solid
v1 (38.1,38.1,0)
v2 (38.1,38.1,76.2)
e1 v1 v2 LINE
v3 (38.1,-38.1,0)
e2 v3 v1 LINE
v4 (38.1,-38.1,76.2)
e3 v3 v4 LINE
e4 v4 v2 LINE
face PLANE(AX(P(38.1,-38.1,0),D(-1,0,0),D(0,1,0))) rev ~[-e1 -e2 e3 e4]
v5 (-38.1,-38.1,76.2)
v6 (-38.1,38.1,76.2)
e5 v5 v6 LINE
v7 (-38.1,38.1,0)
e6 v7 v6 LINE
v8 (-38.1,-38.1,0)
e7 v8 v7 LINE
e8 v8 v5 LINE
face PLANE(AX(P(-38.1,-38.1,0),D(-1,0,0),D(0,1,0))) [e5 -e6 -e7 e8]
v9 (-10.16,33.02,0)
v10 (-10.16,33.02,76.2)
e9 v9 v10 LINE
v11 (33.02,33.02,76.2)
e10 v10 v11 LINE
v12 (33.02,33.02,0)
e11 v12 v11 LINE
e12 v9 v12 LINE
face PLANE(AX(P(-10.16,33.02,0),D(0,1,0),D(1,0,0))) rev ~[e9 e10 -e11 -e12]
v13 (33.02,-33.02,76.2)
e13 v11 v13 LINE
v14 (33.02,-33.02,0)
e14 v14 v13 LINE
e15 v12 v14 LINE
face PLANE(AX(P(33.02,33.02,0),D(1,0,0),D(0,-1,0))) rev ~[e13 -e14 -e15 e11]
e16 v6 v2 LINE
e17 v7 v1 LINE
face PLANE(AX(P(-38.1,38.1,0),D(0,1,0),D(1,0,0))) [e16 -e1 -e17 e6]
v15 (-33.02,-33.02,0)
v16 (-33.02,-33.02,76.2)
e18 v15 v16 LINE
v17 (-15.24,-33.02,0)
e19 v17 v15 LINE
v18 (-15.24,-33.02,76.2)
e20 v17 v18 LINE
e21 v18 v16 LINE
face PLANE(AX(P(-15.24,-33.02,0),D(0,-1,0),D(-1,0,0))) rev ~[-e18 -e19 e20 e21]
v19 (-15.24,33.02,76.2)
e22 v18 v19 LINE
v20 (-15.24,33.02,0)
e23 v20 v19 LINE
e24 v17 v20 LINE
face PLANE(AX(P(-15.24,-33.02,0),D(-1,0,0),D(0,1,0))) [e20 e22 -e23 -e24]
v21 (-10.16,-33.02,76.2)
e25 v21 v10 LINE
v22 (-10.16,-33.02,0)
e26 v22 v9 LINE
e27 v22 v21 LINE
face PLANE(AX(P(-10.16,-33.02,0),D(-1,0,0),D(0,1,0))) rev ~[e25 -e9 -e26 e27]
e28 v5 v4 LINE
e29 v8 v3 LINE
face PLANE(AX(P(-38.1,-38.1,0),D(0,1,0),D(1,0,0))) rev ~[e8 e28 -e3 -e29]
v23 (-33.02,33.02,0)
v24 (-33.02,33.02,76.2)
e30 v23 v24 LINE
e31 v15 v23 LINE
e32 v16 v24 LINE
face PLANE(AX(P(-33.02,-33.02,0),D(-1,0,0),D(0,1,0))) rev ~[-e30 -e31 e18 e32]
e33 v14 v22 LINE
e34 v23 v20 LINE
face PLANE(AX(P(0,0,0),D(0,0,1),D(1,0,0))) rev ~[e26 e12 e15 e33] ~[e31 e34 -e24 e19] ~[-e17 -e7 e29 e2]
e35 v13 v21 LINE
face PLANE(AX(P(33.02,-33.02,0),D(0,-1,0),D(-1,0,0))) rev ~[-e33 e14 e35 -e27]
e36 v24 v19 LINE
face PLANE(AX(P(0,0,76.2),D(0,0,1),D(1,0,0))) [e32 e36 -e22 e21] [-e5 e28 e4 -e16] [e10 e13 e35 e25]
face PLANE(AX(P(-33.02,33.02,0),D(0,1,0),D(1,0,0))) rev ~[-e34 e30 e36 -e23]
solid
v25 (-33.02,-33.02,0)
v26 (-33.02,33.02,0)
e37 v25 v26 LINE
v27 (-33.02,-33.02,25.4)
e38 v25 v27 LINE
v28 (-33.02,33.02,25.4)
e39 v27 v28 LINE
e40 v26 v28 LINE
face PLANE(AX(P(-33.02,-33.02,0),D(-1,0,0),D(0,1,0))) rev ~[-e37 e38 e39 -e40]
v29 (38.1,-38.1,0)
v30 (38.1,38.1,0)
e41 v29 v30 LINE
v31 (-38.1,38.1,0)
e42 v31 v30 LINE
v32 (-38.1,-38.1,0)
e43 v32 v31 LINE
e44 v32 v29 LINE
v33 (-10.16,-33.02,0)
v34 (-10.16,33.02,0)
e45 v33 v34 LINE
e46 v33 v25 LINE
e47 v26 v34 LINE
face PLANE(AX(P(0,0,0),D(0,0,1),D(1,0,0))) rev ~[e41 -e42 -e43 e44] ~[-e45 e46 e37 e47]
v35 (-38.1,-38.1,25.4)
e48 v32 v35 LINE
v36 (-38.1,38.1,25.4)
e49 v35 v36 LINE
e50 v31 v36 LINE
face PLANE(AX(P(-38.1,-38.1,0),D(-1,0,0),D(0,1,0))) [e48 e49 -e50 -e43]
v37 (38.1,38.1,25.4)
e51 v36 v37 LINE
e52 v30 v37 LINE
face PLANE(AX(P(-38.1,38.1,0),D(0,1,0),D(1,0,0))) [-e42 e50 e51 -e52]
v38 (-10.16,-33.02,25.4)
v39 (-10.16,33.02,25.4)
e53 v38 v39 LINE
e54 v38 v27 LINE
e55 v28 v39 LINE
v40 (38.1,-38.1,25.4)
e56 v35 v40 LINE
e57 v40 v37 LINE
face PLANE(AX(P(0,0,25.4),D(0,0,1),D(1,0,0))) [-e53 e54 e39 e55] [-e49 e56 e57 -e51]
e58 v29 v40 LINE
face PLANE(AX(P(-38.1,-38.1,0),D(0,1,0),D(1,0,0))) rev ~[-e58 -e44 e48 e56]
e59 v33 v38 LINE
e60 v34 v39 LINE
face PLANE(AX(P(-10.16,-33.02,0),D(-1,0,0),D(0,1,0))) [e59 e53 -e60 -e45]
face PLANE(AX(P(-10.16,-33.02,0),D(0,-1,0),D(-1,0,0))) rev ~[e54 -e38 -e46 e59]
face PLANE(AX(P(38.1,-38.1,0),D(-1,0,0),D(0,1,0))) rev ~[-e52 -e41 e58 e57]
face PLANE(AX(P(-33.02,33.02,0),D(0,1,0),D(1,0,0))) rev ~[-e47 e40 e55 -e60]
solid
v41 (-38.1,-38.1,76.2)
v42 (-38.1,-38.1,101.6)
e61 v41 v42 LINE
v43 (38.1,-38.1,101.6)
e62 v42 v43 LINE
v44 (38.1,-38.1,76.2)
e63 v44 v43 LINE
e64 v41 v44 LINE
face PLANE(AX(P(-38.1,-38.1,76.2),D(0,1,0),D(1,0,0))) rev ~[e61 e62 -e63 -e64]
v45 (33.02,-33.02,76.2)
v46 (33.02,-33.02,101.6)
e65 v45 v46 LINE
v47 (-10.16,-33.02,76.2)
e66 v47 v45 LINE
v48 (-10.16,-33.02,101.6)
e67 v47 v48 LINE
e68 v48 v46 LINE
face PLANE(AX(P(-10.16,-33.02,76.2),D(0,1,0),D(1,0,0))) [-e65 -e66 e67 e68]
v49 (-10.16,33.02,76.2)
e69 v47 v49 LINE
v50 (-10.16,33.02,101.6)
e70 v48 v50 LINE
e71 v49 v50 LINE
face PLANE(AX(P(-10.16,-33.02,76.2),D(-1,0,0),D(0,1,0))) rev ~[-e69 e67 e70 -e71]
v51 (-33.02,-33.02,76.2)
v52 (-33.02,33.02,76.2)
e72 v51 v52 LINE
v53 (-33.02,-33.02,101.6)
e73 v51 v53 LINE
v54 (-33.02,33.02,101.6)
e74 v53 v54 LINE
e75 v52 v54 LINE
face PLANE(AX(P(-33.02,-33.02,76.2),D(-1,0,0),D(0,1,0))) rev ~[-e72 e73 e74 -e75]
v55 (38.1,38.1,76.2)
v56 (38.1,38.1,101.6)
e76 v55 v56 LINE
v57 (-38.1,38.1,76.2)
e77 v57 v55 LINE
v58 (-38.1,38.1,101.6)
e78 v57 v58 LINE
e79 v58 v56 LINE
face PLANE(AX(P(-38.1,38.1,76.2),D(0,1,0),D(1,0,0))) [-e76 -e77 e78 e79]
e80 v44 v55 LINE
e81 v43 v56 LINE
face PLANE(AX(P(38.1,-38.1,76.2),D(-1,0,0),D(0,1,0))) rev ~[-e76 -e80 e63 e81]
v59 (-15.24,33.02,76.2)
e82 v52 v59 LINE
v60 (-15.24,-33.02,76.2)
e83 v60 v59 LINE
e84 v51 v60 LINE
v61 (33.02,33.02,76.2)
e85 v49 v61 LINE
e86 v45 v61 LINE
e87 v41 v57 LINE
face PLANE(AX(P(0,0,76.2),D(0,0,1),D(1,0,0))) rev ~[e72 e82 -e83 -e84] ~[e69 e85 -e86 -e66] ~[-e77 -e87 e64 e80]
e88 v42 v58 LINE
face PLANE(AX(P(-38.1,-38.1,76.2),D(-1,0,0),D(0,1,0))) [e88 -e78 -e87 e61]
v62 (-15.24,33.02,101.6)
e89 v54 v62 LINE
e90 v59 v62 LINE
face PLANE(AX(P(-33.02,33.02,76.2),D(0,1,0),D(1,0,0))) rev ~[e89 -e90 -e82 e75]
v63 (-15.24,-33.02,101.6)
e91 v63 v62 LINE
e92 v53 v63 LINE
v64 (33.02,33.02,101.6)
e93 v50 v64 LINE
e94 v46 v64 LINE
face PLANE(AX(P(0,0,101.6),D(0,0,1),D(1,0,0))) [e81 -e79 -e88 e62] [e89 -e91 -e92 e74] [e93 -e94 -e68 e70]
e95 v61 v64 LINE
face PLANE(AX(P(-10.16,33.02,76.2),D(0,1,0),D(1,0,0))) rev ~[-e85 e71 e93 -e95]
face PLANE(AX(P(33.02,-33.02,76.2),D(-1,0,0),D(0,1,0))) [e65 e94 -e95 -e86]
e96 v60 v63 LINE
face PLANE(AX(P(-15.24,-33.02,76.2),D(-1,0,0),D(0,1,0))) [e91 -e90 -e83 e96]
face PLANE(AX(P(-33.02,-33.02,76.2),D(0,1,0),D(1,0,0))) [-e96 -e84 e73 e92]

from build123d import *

# Parameters (mm, degrees)
F0_W        = 76.2
F0_H        = 76.2
F0_W_2      = 5.08
F0_H_2      = 66.04
F1_DEPTH    = 76.2
F0_W_3      = 43.18
F1_FACE_W   = 76.2
F1_FACE_H   = 76.2
F1_FACE_W_2 = 43.18
F1_FACE_H_2 = 66.04
F1_FACE_W_3 = 17.78
F2_DEPTH    = 25.4


# Not quite as in the source:
# - a feature names something its author has since deleted; it is built from what else it names


with BuildPart() as f1:
    # F0 (on Top) → F1 (new body)
    with BuildSketch(Plane.XY):
        Rectangle(F0_W, F0_H)
        Polygon((-10.16, 33.02), (33.02, 33.02), (33.02, -33.02), (-10.16, -33.02), (-15.24, -33.02), (-33.02, -33.02), (-33.02, 33.02), (-15.24, 33.02), align=None, mode=Mode.SUBTRACT)
        with Locations((-12.7, 0)):
            Rectangle(F0_W_2, F0_H_2)
    extrude(amount=F1_DEPTH)


with BuildPart() as f2:
    # F0 (on Top) + F1_face (on face) → F2 (new body)
    with BuildSketch(Plane.XY):
        Rectangle(F0_W, F0_H)
        Polygon((-10.16, 33.02), (33.02, 33.02), (33.02, -33.02), (-10.16, -33.02), (-15.24, -33.02), (-33.02, -33.02), (-33.02, 33.02), (-15.24, 33.02), align=None, mode=Mode.SUBTRACT)
        with Locations((11.43, 0)):
            Rectangle(F0_W_3, F0_H_2)
    with BuildSketch(Plane(origin=(-2.3927536232, 0, 76.2), x_dir=(1, 0, 0), z_dir=(0, 0, 1))):
        with Locations((2.3927536232, 0)):
            Rectangle(F1_FACE_W, F1_FACE_H)
        with Locations((13.8227536232, 0)):
            Rectangle(F1_FACE_W_2, F1_FACE_H_2, mode=Mode.SUBTRACT)
        with Locations((-21.7372463768, 0)):
            Rectangle(F1_FACE_W_3, F1_FACE_H_2, mode=Mode.SUBTRACT)
    extrude(amount=F2_DEPTH)


solid = Compound([f1.part, f2.part])
